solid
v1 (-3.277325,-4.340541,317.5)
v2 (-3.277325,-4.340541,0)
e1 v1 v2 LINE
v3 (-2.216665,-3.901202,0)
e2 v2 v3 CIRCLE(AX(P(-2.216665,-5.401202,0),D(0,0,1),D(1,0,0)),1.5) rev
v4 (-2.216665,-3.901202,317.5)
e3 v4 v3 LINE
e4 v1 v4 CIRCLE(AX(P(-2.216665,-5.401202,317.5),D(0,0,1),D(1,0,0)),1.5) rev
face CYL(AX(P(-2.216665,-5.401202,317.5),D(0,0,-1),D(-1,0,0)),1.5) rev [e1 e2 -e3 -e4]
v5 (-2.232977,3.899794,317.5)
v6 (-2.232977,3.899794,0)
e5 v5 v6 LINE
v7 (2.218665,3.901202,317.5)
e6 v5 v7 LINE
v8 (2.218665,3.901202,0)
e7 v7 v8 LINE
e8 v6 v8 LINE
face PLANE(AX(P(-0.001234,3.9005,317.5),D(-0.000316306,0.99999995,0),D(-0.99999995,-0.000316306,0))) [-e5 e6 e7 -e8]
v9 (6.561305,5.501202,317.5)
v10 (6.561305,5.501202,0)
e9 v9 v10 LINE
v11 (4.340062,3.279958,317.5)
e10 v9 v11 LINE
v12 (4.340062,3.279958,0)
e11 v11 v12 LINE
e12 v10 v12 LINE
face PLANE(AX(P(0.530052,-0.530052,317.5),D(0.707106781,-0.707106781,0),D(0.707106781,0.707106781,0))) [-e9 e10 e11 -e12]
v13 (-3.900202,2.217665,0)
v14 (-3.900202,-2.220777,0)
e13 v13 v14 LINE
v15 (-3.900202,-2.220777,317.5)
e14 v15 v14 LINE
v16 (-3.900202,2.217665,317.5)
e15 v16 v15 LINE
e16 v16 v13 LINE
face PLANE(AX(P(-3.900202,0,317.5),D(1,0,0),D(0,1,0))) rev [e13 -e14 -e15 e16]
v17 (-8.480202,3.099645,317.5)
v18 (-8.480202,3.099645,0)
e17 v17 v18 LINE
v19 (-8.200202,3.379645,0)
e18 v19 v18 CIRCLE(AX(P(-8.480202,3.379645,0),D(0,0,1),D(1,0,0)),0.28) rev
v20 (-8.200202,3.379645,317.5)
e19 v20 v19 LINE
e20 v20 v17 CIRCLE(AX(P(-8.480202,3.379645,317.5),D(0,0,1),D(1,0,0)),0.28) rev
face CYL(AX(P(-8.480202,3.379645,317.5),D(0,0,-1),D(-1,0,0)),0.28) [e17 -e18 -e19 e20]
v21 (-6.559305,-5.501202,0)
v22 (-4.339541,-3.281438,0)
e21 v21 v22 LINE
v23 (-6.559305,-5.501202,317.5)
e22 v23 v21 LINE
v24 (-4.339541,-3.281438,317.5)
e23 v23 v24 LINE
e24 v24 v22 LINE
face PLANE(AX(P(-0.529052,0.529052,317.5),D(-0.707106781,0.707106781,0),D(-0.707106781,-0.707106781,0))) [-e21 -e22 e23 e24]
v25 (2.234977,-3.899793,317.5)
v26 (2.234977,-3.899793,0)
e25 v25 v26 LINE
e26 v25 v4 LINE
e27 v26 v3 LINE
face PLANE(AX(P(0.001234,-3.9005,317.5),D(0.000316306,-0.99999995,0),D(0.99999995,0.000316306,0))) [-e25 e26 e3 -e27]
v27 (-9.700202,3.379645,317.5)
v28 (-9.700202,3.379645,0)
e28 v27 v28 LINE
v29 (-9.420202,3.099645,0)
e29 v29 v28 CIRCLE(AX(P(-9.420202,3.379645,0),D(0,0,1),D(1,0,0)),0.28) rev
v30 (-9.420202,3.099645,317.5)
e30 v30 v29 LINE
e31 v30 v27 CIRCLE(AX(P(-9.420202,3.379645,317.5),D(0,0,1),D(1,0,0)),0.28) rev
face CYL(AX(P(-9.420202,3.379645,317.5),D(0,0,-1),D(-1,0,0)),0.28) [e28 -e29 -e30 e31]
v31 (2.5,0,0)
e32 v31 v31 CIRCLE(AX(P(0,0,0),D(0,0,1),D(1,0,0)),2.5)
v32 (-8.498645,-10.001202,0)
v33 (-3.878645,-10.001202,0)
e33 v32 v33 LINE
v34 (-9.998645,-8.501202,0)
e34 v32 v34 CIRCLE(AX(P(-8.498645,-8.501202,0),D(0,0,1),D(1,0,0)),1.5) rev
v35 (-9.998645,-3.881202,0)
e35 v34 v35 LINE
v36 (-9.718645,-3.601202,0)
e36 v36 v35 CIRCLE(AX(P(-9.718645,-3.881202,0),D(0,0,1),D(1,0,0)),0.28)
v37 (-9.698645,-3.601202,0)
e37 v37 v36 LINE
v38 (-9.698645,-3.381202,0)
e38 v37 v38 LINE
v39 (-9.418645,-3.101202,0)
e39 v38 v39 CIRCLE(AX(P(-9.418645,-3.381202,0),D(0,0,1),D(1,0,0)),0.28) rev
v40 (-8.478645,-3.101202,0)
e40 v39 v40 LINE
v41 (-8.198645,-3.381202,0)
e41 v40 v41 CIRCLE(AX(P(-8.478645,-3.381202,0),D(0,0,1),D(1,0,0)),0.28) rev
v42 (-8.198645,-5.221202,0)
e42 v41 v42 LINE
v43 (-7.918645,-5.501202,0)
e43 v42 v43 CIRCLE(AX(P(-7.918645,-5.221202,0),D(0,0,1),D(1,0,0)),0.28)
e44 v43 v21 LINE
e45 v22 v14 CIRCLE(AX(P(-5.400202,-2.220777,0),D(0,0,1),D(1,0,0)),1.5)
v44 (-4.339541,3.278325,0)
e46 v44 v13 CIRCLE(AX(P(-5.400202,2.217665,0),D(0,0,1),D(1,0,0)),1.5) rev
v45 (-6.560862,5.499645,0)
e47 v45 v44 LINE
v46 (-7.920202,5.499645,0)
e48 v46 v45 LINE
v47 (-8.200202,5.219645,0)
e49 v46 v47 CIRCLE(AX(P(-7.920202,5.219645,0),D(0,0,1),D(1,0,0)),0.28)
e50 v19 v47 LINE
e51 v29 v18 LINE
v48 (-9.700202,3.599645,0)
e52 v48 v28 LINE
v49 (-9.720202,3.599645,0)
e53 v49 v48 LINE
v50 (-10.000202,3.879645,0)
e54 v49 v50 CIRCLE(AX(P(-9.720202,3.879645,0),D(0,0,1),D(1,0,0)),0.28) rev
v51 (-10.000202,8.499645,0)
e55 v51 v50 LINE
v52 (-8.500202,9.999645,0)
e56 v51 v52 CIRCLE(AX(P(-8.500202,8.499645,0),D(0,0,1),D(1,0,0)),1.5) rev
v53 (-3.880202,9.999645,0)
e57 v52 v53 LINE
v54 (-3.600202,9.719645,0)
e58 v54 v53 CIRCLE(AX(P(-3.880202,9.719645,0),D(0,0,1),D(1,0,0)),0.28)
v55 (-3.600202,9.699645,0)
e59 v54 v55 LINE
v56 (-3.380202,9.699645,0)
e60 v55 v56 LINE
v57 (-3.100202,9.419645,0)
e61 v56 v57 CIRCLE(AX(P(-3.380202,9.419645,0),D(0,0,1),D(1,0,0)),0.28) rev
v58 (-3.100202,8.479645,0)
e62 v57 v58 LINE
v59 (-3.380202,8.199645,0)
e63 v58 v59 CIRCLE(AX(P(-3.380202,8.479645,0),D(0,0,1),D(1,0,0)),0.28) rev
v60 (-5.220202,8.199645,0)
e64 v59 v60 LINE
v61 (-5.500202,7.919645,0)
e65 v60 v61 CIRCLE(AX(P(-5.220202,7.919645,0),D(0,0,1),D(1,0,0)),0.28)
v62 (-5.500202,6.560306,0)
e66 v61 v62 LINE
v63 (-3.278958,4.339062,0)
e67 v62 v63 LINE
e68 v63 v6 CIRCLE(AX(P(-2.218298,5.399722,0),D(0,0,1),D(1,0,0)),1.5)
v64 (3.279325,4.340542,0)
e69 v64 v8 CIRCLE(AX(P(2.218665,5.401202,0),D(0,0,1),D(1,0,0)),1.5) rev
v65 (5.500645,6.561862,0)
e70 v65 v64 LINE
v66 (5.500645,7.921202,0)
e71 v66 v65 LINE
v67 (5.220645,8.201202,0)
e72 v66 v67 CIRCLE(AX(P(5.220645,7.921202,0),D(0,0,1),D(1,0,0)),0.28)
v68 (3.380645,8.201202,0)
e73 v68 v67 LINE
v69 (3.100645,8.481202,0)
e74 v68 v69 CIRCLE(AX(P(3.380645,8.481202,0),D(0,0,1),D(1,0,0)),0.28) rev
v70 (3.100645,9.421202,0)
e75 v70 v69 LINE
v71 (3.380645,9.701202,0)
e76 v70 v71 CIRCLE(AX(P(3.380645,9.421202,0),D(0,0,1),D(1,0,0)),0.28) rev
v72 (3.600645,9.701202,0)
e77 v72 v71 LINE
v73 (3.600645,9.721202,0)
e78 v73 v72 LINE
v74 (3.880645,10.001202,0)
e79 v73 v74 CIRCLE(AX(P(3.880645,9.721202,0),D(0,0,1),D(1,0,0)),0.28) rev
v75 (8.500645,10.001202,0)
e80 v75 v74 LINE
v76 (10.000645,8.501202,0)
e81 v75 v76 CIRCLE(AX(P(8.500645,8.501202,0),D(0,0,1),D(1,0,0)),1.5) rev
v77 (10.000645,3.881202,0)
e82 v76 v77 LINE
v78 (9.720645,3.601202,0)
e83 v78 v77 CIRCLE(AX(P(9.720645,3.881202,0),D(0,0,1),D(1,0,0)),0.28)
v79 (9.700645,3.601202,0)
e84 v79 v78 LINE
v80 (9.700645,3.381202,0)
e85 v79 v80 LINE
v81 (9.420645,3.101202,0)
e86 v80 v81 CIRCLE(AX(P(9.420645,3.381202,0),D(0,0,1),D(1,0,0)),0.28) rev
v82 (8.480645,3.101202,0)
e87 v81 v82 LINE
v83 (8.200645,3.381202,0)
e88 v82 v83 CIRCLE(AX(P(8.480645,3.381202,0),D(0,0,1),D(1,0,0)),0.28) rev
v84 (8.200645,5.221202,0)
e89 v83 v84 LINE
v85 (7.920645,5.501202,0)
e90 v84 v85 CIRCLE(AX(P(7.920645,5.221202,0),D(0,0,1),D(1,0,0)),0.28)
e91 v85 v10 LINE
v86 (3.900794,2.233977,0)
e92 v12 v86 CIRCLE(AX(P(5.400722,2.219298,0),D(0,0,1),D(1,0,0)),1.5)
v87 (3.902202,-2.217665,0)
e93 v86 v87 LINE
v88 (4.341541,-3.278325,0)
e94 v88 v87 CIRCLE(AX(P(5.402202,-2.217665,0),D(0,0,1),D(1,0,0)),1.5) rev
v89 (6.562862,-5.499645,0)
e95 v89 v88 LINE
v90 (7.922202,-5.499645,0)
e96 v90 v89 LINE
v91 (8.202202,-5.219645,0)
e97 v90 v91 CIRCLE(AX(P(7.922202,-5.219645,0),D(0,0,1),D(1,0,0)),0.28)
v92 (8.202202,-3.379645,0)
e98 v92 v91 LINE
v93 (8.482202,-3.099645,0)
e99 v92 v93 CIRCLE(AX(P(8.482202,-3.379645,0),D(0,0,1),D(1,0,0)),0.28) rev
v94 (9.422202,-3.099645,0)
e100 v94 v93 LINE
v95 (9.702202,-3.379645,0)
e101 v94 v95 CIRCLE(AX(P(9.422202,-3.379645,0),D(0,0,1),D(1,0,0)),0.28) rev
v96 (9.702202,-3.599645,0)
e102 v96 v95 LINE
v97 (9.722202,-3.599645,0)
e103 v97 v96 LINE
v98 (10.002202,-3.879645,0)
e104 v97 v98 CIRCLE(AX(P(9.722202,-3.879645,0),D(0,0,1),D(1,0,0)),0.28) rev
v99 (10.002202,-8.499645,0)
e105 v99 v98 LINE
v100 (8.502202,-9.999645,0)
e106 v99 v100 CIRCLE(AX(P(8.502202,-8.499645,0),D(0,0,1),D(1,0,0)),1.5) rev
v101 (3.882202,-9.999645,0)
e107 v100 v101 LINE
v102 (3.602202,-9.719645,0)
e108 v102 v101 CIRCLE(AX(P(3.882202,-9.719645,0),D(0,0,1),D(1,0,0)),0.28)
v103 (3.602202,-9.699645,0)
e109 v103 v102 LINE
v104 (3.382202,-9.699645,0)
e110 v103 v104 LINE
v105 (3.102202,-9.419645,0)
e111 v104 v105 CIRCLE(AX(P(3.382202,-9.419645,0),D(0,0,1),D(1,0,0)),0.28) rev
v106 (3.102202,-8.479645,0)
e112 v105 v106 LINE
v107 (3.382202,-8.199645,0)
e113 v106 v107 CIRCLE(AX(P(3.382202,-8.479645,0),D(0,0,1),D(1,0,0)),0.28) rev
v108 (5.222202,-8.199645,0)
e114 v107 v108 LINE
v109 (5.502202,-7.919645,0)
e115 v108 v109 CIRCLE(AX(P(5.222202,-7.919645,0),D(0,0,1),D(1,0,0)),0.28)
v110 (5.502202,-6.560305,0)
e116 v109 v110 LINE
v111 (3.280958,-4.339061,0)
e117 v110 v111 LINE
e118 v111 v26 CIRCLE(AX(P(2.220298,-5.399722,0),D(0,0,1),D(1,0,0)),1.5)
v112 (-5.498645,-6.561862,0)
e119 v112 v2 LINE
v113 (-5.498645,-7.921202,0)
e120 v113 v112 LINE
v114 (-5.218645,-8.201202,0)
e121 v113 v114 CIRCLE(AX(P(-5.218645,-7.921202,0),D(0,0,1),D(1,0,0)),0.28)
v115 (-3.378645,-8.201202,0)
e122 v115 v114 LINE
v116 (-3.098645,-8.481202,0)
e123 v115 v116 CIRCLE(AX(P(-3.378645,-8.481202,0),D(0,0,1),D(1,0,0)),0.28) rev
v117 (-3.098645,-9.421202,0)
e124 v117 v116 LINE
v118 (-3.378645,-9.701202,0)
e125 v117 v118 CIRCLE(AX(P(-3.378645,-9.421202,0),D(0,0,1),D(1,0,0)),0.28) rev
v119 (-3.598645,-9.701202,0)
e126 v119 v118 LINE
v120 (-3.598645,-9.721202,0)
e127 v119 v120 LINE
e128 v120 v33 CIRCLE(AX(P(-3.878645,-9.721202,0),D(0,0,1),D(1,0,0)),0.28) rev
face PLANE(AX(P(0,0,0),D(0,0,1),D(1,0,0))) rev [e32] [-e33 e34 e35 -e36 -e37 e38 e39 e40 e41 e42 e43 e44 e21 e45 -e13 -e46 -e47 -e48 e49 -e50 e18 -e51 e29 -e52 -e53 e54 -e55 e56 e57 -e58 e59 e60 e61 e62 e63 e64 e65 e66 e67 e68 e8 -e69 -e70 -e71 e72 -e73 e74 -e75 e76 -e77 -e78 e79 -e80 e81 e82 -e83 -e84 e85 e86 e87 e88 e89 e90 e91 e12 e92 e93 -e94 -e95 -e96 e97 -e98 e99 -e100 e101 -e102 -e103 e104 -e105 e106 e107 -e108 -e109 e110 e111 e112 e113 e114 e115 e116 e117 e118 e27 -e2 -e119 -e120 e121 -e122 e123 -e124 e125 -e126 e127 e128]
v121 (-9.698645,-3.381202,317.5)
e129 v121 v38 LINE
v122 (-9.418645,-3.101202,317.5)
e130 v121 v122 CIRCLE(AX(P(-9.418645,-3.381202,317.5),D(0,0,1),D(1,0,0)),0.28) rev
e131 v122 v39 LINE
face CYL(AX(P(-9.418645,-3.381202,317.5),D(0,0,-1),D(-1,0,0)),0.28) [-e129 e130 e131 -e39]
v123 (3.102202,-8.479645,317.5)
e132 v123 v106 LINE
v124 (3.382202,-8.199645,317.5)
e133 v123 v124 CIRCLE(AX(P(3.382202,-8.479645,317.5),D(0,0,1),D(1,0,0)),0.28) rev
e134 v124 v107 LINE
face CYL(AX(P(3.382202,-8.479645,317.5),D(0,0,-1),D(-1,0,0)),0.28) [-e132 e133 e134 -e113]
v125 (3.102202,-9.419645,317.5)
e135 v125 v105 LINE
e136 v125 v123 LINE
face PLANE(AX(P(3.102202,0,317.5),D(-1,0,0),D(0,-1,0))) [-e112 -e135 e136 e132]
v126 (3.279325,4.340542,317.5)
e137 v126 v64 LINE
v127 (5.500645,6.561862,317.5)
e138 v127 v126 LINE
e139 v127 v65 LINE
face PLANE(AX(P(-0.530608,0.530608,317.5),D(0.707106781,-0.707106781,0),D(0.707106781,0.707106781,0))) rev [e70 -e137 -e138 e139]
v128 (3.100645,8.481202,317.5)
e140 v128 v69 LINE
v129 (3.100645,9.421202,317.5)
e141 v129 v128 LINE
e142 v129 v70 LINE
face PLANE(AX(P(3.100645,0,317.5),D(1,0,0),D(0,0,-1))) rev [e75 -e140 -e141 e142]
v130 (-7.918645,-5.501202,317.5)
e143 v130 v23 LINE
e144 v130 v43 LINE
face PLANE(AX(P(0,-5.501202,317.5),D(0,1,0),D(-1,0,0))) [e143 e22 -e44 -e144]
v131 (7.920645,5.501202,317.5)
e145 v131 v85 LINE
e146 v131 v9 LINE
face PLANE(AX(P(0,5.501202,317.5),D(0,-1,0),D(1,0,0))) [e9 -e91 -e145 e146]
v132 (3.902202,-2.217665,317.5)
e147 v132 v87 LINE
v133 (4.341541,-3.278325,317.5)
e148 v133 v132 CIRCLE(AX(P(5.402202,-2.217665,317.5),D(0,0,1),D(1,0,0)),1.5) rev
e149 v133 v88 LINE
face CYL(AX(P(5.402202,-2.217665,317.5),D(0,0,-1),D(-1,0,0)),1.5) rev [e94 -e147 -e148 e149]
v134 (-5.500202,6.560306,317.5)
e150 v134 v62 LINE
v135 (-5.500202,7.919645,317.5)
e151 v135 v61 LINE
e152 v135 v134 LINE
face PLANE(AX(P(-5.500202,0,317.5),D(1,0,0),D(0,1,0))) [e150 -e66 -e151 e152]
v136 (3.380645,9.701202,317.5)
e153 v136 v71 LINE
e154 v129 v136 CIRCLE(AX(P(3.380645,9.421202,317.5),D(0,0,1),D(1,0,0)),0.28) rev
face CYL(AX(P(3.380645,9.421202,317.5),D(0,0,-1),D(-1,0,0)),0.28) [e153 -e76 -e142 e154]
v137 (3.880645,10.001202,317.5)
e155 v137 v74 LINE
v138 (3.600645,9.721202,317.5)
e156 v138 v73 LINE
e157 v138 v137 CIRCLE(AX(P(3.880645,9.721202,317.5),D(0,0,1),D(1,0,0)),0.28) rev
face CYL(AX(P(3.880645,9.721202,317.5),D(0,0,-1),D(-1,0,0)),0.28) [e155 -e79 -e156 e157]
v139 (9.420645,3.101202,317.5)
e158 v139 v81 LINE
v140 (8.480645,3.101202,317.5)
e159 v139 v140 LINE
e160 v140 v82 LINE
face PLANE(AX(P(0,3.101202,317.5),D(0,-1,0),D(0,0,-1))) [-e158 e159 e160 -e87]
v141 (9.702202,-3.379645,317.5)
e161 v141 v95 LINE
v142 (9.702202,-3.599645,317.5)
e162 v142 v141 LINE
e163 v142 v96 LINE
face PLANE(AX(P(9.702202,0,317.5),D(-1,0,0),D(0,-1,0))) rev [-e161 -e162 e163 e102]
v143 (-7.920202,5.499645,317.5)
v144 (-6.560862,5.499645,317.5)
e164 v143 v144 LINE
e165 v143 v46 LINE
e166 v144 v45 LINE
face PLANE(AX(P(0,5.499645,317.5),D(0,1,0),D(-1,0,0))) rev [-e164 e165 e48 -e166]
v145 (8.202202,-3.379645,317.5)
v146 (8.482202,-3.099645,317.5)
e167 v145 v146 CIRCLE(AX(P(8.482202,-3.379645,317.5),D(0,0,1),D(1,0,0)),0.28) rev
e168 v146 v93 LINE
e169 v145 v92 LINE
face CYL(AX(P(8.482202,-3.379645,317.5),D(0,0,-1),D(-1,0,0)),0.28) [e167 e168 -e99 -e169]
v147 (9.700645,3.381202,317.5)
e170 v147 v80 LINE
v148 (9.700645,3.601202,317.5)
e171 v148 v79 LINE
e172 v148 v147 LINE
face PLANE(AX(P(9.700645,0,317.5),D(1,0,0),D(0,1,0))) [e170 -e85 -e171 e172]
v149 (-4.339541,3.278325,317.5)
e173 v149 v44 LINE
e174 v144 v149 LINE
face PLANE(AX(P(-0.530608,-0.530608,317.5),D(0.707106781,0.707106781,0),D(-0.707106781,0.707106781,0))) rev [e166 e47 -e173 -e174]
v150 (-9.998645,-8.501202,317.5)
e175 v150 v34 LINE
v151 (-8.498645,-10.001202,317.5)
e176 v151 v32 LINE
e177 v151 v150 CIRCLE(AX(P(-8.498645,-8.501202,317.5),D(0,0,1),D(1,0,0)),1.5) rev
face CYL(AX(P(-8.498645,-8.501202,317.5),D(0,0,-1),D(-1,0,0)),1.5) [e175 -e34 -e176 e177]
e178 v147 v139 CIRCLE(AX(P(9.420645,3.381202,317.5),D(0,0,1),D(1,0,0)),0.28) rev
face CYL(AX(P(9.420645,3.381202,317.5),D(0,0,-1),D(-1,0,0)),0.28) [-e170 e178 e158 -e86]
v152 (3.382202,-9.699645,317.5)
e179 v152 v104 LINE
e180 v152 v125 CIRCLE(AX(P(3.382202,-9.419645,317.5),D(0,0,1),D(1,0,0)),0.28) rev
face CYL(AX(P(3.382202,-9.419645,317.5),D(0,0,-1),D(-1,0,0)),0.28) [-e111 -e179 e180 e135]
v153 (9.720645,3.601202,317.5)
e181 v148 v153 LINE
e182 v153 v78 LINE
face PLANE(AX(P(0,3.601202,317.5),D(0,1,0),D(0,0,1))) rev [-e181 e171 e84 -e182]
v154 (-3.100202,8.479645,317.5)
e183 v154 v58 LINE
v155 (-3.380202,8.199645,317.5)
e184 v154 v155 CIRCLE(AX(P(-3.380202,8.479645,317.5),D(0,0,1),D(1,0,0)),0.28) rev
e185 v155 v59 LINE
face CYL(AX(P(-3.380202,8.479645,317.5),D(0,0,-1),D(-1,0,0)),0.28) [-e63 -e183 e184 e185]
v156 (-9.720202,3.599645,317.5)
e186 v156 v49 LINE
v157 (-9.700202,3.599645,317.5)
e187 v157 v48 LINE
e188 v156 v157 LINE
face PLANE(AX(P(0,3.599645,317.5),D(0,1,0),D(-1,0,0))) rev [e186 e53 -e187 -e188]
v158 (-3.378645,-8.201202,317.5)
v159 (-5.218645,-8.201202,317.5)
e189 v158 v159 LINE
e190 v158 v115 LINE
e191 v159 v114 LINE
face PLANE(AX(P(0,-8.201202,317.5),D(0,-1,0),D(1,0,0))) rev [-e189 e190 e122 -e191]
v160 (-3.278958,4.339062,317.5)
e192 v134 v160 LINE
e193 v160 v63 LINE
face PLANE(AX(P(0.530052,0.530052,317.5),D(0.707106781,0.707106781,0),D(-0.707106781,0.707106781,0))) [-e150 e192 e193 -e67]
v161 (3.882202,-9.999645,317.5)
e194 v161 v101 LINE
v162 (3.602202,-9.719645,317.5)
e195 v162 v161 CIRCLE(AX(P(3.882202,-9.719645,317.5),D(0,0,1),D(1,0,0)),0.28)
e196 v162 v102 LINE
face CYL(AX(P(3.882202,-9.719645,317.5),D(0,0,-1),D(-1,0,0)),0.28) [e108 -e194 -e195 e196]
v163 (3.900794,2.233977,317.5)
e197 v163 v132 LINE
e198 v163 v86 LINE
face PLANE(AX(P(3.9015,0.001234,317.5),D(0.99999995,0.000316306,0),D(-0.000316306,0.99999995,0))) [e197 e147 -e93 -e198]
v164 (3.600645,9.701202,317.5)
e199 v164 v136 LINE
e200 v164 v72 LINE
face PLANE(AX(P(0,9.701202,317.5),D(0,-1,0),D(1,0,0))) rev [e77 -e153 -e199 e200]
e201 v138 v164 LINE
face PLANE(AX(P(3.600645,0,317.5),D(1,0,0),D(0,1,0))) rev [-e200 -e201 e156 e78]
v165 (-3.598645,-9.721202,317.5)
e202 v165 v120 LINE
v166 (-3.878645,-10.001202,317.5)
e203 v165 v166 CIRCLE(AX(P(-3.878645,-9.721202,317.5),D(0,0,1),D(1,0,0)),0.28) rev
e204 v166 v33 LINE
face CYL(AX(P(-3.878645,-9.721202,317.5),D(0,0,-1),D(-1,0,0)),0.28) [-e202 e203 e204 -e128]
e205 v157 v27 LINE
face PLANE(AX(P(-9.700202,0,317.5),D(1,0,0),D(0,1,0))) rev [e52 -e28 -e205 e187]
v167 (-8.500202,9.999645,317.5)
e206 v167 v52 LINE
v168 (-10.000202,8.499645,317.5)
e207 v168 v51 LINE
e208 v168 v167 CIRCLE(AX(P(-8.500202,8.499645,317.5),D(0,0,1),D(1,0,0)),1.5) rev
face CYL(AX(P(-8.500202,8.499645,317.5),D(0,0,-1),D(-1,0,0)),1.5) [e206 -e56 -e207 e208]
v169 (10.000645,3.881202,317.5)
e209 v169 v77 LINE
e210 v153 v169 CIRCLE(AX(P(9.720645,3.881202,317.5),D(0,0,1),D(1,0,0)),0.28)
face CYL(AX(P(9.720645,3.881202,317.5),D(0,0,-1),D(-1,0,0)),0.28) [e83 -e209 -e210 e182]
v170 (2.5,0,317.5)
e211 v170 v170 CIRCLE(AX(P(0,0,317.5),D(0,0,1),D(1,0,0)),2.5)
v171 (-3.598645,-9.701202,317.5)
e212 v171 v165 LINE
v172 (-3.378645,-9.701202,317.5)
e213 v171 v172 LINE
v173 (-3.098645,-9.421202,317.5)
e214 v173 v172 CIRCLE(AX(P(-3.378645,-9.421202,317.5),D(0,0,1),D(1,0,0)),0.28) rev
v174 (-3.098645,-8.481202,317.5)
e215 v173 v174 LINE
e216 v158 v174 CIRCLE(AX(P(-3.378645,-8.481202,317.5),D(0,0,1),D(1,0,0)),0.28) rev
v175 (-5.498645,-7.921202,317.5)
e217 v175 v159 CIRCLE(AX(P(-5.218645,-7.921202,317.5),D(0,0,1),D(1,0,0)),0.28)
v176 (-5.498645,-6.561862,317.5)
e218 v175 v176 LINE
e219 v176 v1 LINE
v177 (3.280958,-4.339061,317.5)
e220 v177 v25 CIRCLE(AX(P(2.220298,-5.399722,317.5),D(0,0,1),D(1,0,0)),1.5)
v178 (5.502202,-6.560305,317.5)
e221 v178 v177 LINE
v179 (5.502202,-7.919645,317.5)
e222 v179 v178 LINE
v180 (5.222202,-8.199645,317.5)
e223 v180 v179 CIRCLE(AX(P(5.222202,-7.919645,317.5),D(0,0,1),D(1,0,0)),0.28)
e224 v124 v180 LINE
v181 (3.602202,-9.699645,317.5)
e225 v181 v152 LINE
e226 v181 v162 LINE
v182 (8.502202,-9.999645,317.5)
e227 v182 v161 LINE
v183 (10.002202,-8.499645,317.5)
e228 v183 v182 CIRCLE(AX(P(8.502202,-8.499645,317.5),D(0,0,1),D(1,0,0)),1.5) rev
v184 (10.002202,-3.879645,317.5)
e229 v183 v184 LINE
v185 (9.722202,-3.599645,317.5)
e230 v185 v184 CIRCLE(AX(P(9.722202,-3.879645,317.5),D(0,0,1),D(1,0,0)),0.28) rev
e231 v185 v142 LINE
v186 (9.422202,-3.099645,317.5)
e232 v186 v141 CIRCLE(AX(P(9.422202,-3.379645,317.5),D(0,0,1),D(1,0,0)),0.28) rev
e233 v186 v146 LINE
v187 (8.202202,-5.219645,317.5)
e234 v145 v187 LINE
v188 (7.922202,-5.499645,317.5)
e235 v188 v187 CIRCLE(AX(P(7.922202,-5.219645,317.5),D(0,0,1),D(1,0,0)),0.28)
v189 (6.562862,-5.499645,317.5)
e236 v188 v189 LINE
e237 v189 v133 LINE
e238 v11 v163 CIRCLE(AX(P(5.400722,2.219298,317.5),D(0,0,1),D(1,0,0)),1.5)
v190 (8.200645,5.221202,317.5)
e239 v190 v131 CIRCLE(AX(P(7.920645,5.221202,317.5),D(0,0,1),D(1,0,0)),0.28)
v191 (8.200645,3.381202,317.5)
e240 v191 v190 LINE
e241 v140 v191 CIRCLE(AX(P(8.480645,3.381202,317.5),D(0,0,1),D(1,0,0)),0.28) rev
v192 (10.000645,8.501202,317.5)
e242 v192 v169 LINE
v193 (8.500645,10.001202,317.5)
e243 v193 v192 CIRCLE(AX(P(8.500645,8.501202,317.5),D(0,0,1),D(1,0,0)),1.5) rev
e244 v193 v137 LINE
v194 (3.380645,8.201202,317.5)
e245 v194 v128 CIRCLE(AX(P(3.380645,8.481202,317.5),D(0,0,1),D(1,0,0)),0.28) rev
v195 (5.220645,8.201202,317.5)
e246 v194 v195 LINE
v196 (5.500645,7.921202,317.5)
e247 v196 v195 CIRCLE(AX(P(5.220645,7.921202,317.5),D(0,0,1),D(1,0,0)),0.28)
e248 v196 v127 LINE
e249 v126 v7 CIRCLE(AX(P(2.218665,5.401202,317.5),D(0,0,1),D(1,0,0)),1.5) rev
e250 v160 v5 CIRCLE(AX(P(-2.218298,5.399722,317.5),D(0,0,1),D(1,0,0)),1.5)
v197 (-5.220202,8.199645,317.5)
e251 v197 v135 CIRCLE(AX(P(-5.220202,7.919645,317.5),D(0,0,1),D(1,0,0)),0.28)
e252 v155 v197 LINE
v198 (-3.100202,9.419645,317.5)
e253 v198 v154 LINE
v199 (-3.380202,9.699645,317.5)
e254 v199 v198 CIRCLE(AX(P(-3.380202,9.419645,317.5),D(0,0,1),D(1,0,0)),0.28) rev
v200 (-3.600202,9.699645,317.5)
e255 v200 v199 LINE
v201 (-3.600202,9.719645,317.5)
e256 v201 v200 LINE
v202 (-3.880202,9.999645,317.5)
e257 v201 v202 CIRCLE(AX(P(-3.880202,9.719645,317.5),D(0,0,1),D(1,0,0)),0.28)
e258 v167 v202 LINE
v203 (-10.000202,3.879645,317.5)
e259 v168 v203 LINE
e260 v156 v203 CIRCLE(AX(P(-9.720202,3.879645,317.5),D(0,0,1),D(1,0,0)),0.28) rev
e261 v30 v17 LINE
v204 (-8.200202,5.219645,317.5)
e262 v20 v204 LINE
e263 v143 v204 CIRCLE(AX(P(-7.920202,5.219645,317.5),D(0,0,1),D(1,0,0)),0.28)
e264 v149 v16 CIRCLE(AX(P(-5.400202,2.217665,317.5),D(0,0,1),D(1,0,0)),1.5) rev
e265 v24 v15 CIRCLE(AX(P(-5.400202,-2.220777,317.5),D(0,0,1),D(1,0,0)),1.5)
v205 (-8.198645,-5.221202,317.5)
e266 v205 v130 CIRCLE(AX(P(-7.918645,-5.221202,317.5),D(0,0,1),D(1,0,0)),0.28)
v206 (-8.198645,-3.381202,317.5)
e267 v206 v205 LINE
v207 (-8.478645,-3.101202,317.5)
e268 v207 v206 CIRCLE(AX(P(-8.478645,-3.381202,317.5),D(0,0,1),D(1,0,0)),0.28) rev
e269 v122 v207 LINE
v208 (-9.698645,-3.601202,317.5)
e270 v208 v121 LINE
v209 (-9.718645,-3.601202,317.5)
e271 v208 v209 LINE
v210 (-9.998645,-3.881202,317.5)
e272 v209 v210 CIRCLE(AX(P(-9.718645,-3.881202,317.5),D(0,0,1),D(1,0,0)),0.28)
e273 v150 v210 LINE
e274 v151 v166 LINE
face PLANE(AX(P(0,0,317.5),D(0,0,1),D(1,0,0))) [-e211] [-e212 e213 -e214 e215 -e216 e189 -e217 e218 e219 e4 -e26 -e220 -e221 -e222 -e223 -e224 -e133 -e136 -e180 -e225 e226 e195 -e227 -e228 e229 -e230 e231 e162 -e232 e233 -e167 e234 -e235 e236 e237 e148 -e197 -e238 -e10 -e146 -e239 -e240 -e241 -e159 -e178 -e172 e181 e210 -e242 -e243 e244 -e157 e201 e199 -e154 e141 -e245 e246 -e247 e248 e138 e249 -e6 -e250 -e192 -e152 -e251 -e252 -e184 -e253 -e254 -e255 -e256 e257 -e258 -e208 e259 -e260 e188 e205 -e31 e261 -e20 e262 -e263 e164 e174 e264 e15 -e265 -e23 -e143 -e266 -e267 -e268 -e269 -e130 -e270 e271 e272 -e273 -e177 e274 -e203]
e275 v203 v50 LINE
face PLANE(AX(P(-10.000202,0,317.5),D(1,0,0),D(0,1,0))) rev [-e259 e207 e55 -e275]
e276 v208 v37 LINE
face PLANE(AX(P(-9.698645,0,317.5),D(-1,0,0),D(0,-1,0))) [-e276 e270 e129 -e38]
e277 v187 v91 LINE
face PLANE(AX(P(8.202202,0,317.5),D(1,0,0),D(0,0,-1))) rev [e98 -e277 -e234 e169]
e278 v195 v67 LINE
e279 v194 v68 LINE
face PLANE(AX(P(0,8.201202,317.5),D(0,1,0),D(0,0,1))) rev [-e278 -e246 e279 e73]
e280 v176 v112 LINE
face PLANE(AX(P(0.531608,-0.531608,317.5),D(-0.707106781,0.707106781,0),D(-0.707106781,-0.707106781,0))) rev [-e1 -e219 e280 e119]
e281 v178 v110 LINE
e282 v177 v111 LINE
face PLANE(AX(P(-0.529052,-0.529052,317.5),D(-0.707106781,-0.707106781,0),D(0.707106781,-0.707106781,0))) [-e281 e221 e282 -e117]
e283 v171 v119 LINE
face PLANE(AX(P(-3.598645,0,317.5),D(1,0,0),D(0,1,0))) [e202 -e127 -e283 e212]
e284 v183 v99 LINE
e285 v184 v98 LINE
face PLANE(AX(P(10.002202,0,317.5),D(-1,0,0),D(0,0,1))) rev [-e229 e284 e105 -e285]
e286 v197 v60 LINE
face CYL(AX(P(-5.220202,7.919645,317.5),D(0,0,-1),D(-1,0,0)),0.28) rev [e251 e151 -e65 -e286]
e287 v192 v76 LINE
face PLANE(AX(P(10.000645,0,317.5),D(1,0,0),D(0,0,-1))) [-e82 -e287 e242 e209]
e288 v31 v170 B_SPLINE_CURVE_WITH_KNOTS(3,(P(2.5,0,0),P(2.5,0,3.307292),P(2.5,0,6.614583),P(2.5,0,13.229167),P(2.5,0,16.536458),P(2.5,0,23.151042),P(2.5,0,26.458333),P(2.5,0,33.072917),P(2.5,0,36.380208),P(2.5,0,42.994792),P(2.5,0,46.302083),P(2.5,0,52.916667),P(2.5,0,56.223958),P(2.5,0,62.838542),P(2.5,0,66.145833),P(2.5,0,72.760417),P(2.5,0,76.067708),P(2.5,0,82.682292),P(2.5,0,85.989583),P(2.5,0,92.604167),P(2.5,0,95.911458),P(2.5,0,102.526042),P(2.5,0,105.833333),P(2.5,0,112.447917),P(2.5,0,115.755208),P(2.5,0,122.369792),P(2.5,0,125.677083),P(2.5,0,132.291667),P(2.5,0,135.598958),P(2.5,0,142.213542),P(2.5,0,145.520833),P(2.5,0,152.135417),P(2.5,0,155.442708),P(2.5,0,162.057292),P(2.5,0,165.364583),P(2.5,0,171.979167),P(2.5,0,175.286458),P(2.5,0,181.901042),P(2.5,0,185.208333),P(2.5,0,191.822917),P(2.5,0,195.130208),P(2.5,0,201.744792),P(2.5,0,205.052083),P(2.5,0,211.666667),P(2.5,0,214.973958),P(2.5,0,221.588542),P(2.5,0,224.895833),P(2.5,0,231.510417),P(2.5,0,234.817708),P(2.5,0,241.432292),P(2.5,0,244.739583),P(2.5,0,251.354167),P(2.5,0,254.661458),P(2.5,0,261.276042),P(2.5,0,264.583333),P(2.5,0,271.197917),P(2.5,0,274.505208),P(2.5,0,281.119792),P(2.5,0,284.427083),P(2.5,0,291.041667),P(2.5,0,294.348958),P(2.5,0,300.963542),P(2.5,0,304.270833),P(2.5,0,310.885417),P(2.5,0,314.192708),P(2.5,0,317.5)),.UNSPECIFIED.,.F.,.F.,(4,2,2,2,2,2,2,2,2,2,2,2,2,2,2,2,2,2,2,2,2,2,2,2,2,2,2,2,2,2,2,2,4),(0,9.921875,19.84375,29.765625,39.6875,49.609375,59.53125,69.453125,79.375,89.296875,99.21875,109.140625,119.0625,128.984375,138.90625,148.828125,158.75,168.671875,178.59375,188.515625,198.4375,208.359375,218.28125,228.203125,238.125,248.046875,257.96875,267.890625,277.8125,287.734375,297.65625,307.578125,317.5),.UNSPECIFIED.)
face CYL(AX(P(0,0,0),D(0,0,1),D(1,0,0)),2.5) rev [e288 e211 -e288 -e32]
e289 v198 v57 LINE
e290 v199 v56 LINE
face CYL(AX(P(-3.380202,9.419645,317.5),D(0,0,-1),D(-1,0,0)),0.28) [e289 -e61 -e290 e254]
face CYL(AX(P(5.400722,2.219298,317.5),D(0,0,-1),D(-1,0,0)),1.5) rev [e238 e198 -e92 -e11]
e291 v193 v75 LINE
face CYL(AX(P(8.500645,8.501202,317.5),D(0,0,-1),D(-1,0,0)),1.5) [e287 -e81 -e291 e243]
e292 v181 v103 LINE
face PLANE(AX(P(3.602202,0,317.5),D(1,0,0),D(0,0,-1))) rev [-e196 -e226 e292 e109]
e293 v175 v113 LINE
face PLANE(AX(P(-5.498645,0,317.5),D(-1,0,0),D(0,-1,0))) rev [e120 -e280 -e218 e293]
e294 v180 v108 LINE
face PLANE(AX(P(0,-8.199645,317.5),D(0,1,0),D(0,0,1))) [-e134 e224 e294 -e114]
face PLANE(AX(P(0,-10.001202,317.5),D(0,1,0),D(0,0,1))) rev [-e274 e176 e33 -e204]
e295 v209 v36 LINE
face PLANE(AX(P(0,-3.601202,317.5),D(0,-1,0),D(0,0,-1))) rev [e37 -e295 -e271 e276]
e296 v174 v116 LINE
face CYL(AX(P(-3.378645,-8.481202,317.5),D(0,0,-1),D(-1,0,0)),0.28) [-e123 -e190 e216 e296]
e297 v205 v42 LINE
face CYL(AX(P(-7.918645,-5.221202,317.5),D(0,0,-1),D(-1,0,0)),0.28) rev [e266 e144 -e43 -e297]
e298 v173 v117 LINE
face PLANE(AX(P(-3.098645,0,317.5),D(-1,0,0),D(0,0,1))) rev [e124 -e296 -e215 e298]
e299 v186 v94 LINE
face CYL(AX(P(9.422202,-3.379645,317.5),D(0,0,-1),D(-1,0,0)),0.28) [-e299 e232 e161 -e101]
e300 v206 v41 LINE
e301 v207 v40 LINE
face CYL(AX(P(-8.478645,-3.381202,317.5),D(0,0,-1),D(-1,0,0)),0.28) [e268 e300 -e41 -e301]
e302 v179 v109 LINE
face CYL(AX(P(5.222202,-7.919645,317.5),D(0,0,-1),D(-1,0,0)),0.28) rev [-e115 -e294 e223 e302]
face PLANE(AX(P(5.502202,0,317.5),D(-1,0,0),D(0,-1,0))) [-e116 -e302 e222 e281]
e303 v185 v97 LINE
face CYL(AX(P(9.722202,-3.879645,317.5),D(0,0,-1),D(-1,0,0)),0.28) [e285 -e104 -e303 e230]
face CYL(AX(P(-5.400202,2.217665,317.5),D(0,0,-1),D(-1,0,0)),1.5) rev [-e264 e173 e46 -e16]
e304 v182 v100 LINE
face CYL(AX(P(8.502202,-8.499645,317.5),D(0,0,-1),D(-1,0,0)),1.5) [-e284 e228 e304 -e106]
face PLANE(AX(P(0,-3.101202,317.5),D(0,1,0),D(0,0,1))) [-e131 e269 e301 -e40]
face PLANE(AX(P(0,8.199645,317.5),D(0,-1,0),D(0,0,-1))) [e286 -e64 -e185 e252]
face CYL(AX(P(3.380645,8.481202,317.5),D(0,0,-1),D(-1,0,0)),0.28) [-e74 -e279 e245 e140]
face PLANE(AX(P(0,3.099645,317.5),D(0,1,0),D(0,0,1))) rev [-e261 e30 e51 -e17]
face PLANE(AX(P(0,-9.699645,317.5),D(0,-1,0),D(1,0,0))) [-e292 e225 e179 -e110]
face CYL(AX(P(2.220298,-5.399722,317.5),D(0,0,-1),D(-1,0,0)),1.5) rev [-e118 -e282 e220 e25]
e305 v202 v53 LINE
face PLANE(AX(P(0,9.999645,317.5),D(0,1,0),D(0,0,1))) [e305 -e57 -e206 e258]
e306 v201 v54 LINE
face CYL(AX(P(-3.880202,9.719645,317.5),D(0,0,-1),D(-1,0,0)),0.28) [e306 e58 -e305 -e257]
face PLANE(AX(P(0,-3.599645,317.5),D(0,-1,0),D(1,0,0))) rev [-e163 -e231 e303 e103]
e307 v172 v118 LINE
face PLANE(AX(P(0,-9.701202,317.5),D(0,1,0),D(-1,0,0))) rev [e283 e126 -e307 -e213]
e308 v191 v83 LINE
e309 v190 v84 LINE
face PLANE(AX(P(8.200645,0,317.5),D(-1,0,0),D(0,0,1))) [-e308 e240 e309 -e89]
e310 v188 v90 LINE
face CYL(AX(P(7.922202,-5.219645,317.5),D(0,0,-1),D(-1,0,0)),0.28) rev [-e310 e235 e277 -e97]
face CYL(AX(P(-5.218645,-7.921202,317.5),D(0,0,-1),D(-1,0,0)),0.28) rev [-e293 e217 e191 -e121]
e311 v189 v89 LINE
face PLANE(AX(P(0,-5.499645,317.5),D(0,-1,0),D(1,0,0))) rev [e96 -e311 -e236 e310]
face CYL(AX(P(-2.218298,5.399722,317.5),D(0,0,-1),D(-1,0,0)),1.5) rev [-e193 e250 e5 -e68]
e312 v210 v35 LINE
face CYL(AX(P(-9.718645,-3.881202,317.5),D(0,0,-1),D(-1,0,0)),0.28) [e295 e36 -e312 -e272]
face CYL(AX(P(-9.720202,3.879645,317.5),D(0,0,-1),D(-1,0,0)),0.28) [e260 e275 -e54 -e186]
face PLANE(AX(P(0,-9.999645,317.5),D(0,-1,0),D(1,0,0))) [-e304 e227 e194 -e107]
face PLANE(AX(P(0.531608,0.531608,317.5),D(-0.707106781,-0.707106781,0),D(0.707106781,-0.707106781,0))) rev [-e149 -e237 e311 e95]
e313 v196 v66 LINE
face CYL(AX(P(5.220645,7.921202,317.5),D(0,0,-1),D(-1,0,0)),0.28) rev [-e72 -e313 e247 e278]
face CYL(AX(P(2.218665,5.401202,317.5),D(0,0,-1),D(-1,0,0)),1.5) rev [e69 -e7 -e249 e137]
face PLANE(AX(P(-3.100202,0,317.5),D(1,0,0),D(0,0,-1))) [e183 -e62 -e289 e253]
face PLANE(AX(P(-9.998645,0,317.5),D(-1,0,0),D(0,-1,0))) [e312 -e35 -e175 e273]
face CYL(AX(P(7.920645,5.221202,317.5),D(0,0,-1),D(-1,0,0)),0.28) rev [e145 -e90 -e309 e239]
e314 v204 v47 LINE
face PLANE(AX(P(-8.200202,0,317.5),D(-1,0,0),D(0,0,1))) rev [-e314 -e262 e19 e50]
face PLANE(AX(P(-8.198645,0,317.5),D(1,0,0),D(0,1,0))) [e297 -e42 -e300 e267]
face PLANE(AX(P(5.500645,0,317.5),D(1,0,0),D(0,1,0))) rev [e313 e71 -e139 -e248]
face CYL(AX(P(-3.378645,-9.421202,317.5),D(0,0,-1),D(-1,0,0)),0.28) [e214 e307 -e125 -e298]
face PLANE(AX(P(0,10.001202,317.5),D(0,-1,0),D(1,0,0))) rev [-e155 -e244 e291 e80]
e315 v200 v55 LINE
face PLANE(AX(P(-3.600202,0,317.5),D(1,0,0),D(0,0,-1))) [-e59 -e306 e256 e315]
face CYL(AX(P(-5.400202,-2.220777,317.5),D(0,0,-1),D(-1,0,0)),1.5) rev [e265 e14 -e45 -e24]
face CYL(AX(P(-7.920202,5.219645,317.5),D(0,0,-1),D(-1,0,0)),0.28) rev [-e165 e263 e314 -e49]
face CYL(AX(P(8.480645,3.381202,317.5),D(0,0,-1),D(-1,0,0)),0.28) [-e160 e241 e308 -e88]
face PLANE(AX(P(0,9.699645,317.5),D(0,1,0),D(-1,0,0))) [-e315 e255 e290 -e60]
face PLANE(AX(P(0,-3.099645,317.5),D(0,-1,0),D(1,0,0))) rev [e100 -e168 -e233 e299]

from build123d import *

# Parameters (mm, degrees)
BOSS_EXTRUDE1_DEPTH = 317.5
F_3DSKETCH2_R       = 2.5
CUT_EXTRUDE1_DEPTH  = 318.814911662


with BuildPart() as part:
    # Sketch1 → Boss-Extrude1 (new body)
    with BuildSketch(Plane.XY):
        with BuildLine():
            ThreePointArc((-4.339541497, 3.27832502), (-4.01438237, 2.791689997), (-3.900201668, 2.217664848))
            Line((-3.900201668, 2.217664848), (-3.900201668, -2.220777458))
            ThreePointArc((-3.900201668, -2.220777458), (-4.013982246, -2.793835668), (-4.338062619, -3.279956687))
            ThreePointArc((-4.338062619, -3.279956687), (-4.338801799, -3.280697416), (-4.339541497, -3.28143763))
            Line((-4.339541497, -3.28143763), (-6.559305445, -5.501201578))
            Line((-6.559305445, -5.501201578), (-7.918645273, -5.501201578))
            ThreePointArc((-7.918645273, -5.501201578), (-8.116635172, -5.419191476), (-8.198645273, -5.221201578))
            Line((-8.198645273, -5.221201578), (-8.198645273, -3.381201578))
            ThreePointArc((-8.198645273, -3.381201578), (-8.280655374, -3.183211679), (-8.478645273, -3.101201578))
            Line((-8.478645273, -3.101201578), (-9.418645273, -3.101201578))
            ThreePointArc((-9.418645273, -3.101201578), (-9.616635172, -3.183211679), (-9.698645273, -3.381201578))
            Line((-9.698645273, -3.381201578), (-9.698645273, -3.601201578))
            Line((-9.698645273, -3.601201578), (-9.718645273, -3.601201578))
            ThreePointArc((-9.718645273, -3.601201578), (-9.916635172, -3.683211679), (-9.998645273, -3.881201578))
            Line((-9.998645273, -3.881201578), (-9.998645273, -8.501201578))
            ThreePointArc((-9.998645273, -8.501201578), (-9.559305445, -9.561861749), (-8.498645273, -10.001201578))
            Line((-8.498645273, -10.001201578), (-3.878645273, -10.001201578))
            ThreePointArc((-3.878645273, -10.001201578), (-3.680655374, -9.919191476), (-3.598645273, -9.721201578))
            Line((-3.598645273, -9.721201578), (-3.598645273, -9.701201578))
            Line((-3.598645273, -9.701201578), (-3.378645273, -9.701201578))
            ThreePointArc((-3.378645273, -9.701201578), (-3.180655374, -9.619191476), (-3.098645273, -9.421201578))
            Line((-3.098645273, -9.421201578), (-3.098645273, -8.481201578))
            ThreePointArc((-3.098645273, -8.481201578), (-3.180655374, -8.283211679), (-3.378645273, -8.201201578))
            Line((-3.378645273, -8.201201578), (-5.218645273, -8.201201578))
            ThreePointArc((-5.218645273, -8.201201578), (-5.416635172, -8.119191476), (-5.498645273, -7.921201578))
            Line((-5.498645273, -7.921201578), (-5.498645273, -6.561861749))
            Line((-5.498645273, -6.561861749), (-3.277324929, -4.340541406))
            ThreePointArc((-3.277324929, -4.340541406), (-2.790689906, -4.015382279), (-2.216664757, -3.901201578))
            Line((-2.216664757, -3.901201578), (2.234977304, -3.899793498))
            ThreePointArc((2.234977304, -3.899793498), (2.801097117, -4.016727825), (3.280957809, -4.339061494))
            Line((3.280957809, -4.339061494), (5.502201668, -6.560305354))
            Line((5.502201668, -6.560305354), (5.502201668, -7.919645182))
            ThreePointArc((5.502201668, -7.919645182), (5.420191567, -8.117635081), (5.222201668, -8.199645182))
            Line((5.222201668, -8.199645182), (3.382201668, -8.199645182))
            ThreePointArc((3.382201668, -8.199645182), (3.18421177, -8.281655283), (3.102201668, -8.479645182))
            Line((3.102201668, -8.479645182), (3.102201668, -9.419645182))
            ThreePointArc((3.102201668, -9.419645182), (3.18421177, -9.617635081), (3.382201668, -9.699645182))
            Line((3.382201668, -9.699645182), (3.602201668, -9.699645182))
            Line((3.602201668, -9.699645182), (3.602201668, -9.719645182))
            ThreePointArc((3.602201668, -9.719645182), (3.68421177, -9.917635081), (3.882201668, -9.999645182))
            Line((3.882201668, -9.999645182), (8.502201668, -9.999645182))
            ThreePointArc((8.502201668, -9.999645182), (9.56286184, -9.560305354), (10.002201668, -8.499645182))
            Line((10.002201668, -8.499645182), (10.002201668, -3.879645182))
            ThreePointArc((10.002201668, -3.879645182), (9.920191567, -3.681655283), (9.722201668, -3.599645182))
            Line((9.722201668, -3.599645182), (9.702201668, -3.599645182))
            Line((9.702201668, -3.599645182), (9.702201668, -3.379645182))
            ThreePointArc((9.702201668, -3.379645182), (9.620191567, -3.181655283), (9.422201668, -3.099645182))
            Line((9.422201668, -3.099645182), (8.482201668, -3.099645182))
            ThreePointArc((8.482201668, -3.099645182), (8.28421177, -3.181655283), (8.202201668, -3.379645182))
            Line((8.202201668, -3.379645182), (8.202201668, -5.219645182))
            ThreePointArc((8.202201668, -5.219645182), (8.120191567, -5.417635081), (7.922201668, -5.499645182))
            Line((7.922201668, -5.499645182), (6.56286184, -5.499645182))
            Line((6.56286184, -5.499645182), (4.341541497, -3.278324838))
            ThreePointArc((4.341541497, -3.278324838), (4.01638237, -2.791689815), (3.902201668, -2.217664667))
            Line((3.902201668, -2.217664667), (3.900793589, 2.233977395))
            ThreePointArc((3.900793589, 2.233977395), (4.017727916, 2.800097207), (4.340061585, 3.2799579))
            Line((4.340061585, 3.2799579), (6.561305445, 5.501201759))
            Line((6.561305445, 5.501201759), (7.920645273, 5.501201759))
            ThreePointArc((7.920645273, 5.501201759), (8.118635172, 5.419191658), (8.200645273, 5.221201759))
            Line((8.200645273, 5.221201759), (8.200645273, 3.381201759))
            ThreePointArc((8.200645273, 3.381201759), (8.282655374, 3.183211861), (8.480645273, 3.101201759))
            Line((8.480645273, 3.101201759), (9.420645273, 3.101201759))
            ThreePointArc((9.420645273, 3.101201759), (9.618635172, 3.183211861), (9.700645273, 3.381201759))
            Line((9.700645273, 3.381201759), (9.700645273, 3.601201759))
            Line((9.700645273, 3.601201759), (9.720645273, 3.601201759))
            ThreePointArc((9.720645273, 3.601201759), (9.918635172, 3.683211861), (10.000645273, 3.881201759))
            Line((10.000645273, 3.881201759), (10.000645273, 8.501201759))
            ThreePointArc((10.000645273, 8.501201759), (9.561305445, 9.561861931), (8.500645273, 10.001201759))
            Line((8.500645273, 10.001201759), (3.880645273, 10.001201759))
            ThreePointArc((3.880645273, 10.001201759), (3.682655374, 9.919191658), (3.600645273, 9.721201759))
            Line((3.600645273, 9.721201759), (3.600645273, 9.701201759))
            Line((3.600645273, 9.701201759), (3.380645273, 9.701201759))
            ThreePointArc((3.380645273, 9.701201759), (3.182655374, 9.619191658), (3.100645273, 9.421201759))
            Line((3.100645273, 9.421201759), (3.100645273, 8.481201759))
            ThreePointArc((3.100645273, 8.481201759), (3.182655374, 8.283211861), (3.380645273, 8.201201759))
            Line((3.380645273, 8.201201759), (5.220645273, 8.201201759))
            ThreePointArc((5.220645273, 8.201201759), (5.418635172, 8.119191658), (5.500645273, 7.921201759))
            Line((5.500645273, 7.921201759), (5.500645273, 6.561861931))
            Line((5.500645273, 6.561861931), (3.279324929, 4.340541588))
            ThreePointArc((3.279324929, 4.340541588), (2.792689906, 4.015382461), (2.218664757, 3.901201759))
            Line((2.218664757, 3.901201759), (-2.232977304, 3.89979368))
            ThreePointArc((-2.232977304, 3.89979368), (-2.799097117, 4.016728006), (-3.278957809, 4.339061676))
            Line((-3.278957809, 4.339061676), (-5.500201668, 6.560305535))
            Line((-5.500201668, 6.560305535), (-5.500201668, 7.919645364))
            ThreePointArc((-5.500201668, 7.919645364), (-5.418191567, 8.117635262), (-5.220201668, 8.199645364))
            Line((-5.220201668, 8.199645364), (-3.380201668, 8.199645364))
            ThreePointArc((-3.380201668, 8.199645364), (-3.18221177, 8.281655465), (-3.100201668, 8.479645364))
            Line((-3.100201668, 8.479645364), (-3.100201668, 9.419645364))
            ThreePointArc((-3.100201668, 9.419645364), (-3.18221177, 9.617635262), (-3.380201668, 9.699645364))
            Line((-3.380201668, 9.699645364), (-3.600201668, 9.699645364))
            Line((-3.600201668, 9.699645364), (-3.600201668, 9.719645364))
            ThreePointArc((-3.600201668, 9.719645364), (-3.68221177, 9.917635262), (-3.880201668, 9.999645364))
            Line((-3.880201668, 9.999645364), (-8.500201668, 9.999645364))
            ThreePointArc((-8.500201668, 9.999645364), (-9.56086184, 9.560305535), (-10.000201668, 8.499645364))
            Line((-10.000201668, 8.499645364), (-10.000201668, 3.879645364))
            ThreePointArc((-10.000201668, 3.879645364), (-9.918191567, 3.681655465), (-9.720201668, 3.599645364))
            Line((-9.720201668, 3.599645364), (-9.700201668, 3.599645364))
            Line((-9.700201668, 3.599645364), (-9.700201668, 3.379645364))
            ThreePointArc((-9.700201668, 3.379645364), (-9.618191567, 3.181655465), (-9.420201668, 3.099645364))
            Line((-9.420201668, 3.099645364), (-8.480201668, 3.099645364))
            ThreePointArc((-8.480201668, 3.099645364), (-8.28221177, 3.181655465), (-8.200201668, 3.379645364))
            Line((-8.200201668, 3.379645364), (-8.200201668, 5.219645364))
            ThreePointArc((-8.200201668, 5.219645364), (-8.118191567, 5.417635262), (-7.920201668, 5.499645364))
            Line((-7.920201668, 5.499645364), (-6.56086184, 5.499645364))
            Line((-6.56086184, 5.499645364), (-4.339541497, 3.27832502))
        make_face()
    extrude(amount=BOSS_EXTRUDE1_DEPTH)

    # 3DSketch2 → Cut-Extrude1 (cut, through all)
    with BuildSketch(Plane.XY):
        Circle(F_3DSKETCH2_R)
    extrude(amount=CUT_EXTRUDE1_DEPTH, mode=Mode.SUBTRACT)


solid = part.part
